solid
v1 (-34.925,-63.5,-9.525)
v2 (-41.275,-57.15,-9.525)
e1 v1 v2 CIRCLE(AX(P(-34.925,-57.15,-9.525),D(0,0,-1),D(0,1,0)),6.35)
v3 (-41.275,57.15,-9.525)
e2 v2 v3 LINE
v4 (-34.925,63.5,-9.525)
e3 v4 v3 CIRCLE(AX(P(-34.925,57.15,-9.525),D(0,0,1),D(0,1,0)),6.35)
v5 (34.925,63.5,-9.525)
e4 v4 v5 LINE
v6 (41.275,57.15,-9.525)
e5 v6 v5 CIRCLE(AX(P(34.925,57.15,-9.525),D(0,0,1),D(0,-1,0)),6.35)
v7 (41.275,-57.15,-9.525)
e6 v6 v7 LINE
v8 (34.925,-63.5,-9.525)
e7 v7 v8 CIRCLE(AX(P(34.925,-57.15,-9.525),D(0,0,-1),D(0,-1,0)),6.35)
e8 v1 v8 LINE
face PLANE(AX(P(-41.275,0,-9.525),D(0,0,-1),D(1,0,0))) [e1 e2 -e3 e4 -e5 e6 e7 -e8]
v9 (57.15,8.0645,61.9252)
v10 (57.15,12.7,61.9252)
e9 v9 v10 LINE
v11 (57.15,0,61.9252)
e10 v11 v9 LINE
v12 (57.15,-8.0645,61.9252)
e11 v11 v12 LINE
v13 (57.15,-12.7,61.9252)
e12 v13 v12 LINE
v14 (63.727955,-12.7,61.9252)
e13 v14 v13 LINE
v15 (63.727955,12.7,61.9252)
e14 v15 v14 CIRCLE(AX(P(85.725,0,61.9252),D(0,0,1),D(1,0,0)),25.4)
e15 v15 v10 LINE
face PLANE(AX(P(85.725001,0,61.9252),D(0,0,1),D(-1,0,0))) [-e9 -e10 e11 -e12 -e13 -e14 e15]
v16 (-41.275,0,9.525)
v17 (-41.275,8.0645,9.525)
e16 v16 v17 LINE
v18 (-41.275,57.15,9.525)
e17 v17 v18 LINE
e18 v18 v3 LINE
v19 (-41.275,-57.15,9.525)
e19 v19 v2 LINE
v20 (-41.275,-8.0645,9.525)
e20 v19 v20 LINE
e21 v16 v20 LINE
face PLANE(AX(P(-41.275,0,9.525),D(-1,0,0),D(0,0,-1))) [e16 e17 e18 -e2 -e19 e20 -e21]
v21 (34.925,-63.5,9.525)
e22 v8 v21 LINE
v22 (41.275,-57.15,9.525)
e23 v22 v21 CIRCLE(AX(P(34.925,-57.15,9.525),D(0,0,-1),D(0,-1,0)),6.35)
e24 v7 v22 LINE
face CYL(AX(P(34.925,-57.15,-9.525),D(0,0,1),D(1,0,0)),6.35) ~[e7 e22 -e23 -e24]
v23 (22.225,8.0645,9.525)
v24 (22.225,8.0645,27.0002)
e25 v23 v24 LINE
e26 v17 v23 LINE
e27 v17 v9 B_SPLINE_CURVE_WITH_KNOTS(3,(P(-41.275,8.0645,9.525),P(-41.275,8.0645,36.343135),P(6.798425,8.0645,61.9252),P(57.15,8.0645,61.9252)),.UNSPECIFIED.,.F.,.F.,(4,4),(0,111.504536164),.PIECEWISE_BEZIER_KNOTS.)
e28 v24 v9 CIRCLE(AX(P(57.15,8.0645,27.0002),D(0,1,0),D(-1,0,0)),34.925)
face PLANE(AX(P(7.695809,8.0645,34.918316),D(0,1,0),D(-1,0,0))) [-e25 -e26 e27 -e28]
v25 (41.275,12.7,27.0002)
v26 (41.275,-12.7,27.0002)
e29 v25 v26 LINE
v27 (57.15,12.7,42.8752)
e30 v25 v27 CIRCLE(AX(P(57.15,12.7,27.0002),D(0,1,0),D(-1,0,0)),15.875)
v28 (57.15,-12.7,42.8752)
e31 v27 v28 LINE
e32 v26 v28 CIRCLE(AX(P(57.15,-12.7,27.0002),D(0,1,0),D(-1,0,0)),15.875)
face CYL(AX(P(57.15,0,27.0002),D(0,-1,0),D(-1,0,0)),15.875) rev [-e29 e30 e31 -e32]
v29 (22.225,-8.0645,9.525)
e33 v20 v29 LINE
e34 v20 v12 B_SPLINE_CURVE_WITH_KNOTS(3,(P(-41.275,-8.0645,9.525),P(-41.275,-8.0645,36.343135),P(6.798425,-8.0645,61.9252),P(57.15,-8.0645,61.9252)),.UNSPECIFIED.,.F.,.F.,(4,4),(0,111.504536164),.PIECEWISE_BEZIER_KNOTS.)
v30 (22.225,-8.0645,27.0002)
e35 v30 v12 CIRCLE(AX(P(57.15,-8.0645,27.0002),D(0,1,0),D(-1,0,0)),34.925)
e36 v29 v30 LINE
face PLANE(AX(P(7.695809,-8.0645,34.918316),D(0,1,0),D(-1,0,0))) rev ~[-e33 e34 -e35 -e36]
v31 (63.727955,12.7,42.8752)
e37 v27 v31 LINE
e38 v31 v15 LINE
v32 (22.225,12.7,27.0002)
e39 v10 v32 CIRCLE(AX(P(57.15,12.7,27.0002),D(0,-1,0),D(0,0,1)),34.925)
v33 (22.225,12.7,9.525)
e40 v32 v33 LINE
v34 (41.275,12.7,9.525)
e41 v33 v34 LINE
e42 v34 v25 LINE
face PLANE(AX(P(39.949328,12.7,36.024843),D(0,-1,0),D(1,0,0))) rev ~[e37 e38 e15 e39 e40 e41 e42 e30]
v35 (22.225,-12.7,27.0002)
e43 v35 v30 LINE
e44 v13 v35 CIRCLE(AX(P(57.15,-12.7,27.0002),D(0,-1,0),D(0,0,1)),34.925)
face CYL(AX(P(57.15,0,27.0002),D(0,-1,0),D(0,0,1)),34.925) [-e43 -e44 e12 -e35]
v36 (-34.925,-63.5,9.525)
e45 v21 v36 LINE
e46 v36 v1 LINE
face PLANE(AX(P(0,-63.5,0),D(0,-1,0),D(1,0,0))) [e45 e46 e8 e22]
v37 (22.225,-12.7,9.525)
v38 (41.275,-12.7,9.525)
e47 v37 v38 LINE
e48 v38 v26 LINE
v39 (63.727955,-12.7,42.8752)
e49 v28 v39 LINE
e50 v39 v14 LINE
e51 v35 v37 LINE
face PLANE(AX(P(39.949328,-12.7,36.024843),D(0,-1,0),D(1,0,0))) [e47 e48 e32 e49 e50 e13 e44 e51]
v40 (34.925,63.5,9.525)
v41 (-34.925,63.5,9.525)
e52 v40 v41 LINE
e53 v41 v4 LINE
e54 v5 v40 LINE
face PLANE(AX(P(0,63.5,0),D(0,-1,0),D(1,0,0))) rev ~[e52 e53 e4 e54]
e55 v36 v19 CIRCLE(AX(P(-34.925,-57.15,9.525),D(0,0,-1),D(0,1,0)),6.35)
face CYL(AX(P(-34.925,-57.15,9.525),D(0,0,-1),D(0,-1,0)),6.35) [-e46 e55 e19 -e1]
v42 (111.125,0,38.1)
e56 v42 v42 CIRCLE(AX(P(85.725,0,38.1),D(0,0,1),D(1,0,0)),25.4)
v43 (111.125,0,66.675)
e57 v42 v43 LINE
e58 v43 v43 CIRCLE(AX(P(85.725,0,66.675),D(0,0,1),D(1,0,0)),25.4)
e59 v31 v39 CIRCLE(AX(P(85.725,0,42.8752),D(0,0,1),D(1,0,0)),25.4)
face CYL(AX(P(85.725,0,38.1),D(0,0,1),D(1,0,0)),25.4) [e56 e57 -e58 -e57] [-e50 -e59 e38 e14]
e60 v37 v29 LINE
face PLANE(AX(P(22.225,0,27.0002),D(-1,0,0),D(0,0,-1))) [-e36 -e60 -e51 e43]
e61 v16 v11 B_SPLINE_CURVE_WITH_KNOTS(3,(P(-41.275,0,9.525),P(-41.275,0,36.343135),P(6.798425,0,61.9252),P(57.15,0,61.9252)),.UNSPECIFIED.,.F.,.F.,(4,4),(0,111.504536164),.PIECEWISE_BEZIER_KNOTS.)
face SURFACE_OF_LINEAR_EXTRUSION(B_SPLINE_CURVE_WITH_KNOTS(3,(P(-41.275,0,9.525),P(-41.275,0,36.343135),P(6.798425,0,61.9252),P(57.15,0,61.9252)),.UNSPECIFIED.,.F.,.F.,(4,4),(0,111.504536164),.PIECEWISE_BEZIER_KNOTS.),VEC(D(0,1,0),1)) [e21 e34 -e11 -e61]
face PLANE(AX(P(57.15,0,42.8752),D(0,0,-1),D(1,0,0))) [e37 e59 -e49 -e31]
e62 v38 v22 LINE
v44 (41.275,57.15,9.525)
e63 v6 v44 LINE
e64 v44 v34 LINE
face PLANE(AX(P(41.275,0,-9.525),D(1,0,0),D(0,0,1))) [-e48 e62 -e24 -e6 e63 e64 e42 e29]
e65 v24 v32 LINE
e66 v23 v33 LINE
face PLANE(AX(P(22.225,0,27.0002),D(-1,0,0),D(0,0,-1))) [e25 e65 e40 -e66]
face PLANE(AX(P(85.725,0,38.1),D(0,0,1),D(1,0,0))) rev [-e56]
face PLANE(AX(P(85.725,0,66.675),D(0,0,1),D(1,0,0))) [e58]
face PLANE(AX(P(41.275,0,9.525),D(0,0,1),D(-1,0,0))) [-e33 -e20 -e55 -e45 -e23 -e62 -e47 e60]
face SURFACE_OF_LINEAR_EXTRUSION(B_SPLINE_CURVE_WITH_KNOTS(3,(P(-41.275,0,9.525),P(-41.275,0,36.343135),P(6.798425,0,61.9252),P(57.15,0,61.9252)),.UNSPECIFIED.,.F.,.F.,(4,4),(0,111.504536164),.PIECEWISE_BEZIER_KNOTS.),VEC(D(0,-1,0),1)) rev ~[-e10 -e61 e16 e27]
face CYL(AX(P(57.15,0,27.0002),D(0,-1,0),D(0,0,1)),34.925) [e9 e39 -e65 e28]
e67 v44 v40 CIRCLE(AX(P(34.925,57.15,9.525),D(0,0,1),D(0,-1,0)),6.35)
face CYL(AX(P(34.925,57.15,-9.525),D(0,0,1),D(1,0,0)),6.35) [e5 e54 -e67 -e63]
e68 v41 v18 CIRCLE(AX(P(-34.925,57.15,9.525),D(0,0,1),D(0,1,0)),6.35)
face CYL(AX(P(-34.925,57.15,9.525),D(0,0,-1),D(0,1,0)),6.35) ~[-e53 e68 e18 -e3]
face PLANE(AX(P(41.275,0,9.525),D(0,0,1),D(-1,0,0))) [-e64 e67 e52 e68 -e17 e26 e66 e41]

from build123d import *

# Parameters (mm, degrees)
F1_DEPTH = 63.5
F2_DEPTH = 12.7
F3_DEPTH = 8.0645
F5_R     = 6.35


# Not quite as in the source:
# - ends of sketch curves that miss each other by under 0.0002 mm in the source are joined


with BuildPart() as f1:
    # F0 (on Front) → F1 (new body, symmetric)
    with BuildSketch(Plane.XZ):
        Polygon((-41.275, -9.525), (41.275, -9.525), (41.275, 9.525), (22.225, 9.525), (-41.275, 9.525), align=None)
    extrude(amount=F1_DEPTH, both=True)

    # F0 (on Front) → F2 (join, symmetric)
    with BuildSketch(Plane.XZ):
        with BuildLine():
            Line((22.225, 9.525), (41.275, 9.525))
            Line((41.275, 9.525), (41.275, 27.0002))
            ThreePointArc((41.275, 27.0002), (45.9246798487, 38.2255201513), (57.15, 42.8752))
            Line((57.15, 42.8752), (60.325, 42.8752))
            Line((60.325, 42.8752), (60.325, 61.9252))
            Line((60.325, 61.9252), (57.15, 61.9252))
            ThreePointArc((57.15, 61.9252), (32.4542956671, 51.6959043329), (22.225, 27.0002))
            Line((22.225, 27.0002), (22.225, 9.525))
        make_face()
        Polygon((85.7250011283, 61.9252), (60.325, 61.9252), (60.325, 42.8752), (85.725, 42.8752), align=None)
    extrude(amount=F2_DEPTH, both=True)

    # F0 (on Front) → F3 (join, symmetric)
    with BuildSketch(Plane.XZ):
        with BuildLine():
            add(Edge.make_bspline(
                [(-41.275, 9.525), (-41.275, 36.3431351324), (6.7984250959, 61.9252), (57.15, 61.9252)],
                knots=[0, 0, 0, 0, 111.5045361635, 111.5045361635, 111.5045361635, 111.5045361635], degree=3))
            Line((-41.275, 9.525), (22.225, 9.525))
            Line((22.225, 9.525), (22.225, 27.0002))
            ThreePointArc((22.225, 27.0002), (32.4542956671, 51.6959043329), (57.15, 61.9252))
        make_face()
    extrude(amount=F3_DEPTH, both=True)

    # F0 (on Front) → F4 (revolve)
    with BuildSketch(Plane.XZ):
        Polygon((85.725, 66.675), (85.725, 61.9252), (85.725, 42.8752), (85.725, 38.1), (111.125, 38.1), (111.125, 66.675), align=None)
    revolve(axis=Axis((85.725, 0, 52.3875), (0, 0, 1)))

    # F5
    f5_edges = [f1.edges().sort_by_distance(p)[0] for p in [
        (41.275, -63.5, 0),
        (-41.275, -63.5, 0),
        (-41.275, 63.5, 0),
        (41.275, 63.5, 0),
    ]]
    fillet(f5_edges, radius=F5_R)


solid = f1.part
